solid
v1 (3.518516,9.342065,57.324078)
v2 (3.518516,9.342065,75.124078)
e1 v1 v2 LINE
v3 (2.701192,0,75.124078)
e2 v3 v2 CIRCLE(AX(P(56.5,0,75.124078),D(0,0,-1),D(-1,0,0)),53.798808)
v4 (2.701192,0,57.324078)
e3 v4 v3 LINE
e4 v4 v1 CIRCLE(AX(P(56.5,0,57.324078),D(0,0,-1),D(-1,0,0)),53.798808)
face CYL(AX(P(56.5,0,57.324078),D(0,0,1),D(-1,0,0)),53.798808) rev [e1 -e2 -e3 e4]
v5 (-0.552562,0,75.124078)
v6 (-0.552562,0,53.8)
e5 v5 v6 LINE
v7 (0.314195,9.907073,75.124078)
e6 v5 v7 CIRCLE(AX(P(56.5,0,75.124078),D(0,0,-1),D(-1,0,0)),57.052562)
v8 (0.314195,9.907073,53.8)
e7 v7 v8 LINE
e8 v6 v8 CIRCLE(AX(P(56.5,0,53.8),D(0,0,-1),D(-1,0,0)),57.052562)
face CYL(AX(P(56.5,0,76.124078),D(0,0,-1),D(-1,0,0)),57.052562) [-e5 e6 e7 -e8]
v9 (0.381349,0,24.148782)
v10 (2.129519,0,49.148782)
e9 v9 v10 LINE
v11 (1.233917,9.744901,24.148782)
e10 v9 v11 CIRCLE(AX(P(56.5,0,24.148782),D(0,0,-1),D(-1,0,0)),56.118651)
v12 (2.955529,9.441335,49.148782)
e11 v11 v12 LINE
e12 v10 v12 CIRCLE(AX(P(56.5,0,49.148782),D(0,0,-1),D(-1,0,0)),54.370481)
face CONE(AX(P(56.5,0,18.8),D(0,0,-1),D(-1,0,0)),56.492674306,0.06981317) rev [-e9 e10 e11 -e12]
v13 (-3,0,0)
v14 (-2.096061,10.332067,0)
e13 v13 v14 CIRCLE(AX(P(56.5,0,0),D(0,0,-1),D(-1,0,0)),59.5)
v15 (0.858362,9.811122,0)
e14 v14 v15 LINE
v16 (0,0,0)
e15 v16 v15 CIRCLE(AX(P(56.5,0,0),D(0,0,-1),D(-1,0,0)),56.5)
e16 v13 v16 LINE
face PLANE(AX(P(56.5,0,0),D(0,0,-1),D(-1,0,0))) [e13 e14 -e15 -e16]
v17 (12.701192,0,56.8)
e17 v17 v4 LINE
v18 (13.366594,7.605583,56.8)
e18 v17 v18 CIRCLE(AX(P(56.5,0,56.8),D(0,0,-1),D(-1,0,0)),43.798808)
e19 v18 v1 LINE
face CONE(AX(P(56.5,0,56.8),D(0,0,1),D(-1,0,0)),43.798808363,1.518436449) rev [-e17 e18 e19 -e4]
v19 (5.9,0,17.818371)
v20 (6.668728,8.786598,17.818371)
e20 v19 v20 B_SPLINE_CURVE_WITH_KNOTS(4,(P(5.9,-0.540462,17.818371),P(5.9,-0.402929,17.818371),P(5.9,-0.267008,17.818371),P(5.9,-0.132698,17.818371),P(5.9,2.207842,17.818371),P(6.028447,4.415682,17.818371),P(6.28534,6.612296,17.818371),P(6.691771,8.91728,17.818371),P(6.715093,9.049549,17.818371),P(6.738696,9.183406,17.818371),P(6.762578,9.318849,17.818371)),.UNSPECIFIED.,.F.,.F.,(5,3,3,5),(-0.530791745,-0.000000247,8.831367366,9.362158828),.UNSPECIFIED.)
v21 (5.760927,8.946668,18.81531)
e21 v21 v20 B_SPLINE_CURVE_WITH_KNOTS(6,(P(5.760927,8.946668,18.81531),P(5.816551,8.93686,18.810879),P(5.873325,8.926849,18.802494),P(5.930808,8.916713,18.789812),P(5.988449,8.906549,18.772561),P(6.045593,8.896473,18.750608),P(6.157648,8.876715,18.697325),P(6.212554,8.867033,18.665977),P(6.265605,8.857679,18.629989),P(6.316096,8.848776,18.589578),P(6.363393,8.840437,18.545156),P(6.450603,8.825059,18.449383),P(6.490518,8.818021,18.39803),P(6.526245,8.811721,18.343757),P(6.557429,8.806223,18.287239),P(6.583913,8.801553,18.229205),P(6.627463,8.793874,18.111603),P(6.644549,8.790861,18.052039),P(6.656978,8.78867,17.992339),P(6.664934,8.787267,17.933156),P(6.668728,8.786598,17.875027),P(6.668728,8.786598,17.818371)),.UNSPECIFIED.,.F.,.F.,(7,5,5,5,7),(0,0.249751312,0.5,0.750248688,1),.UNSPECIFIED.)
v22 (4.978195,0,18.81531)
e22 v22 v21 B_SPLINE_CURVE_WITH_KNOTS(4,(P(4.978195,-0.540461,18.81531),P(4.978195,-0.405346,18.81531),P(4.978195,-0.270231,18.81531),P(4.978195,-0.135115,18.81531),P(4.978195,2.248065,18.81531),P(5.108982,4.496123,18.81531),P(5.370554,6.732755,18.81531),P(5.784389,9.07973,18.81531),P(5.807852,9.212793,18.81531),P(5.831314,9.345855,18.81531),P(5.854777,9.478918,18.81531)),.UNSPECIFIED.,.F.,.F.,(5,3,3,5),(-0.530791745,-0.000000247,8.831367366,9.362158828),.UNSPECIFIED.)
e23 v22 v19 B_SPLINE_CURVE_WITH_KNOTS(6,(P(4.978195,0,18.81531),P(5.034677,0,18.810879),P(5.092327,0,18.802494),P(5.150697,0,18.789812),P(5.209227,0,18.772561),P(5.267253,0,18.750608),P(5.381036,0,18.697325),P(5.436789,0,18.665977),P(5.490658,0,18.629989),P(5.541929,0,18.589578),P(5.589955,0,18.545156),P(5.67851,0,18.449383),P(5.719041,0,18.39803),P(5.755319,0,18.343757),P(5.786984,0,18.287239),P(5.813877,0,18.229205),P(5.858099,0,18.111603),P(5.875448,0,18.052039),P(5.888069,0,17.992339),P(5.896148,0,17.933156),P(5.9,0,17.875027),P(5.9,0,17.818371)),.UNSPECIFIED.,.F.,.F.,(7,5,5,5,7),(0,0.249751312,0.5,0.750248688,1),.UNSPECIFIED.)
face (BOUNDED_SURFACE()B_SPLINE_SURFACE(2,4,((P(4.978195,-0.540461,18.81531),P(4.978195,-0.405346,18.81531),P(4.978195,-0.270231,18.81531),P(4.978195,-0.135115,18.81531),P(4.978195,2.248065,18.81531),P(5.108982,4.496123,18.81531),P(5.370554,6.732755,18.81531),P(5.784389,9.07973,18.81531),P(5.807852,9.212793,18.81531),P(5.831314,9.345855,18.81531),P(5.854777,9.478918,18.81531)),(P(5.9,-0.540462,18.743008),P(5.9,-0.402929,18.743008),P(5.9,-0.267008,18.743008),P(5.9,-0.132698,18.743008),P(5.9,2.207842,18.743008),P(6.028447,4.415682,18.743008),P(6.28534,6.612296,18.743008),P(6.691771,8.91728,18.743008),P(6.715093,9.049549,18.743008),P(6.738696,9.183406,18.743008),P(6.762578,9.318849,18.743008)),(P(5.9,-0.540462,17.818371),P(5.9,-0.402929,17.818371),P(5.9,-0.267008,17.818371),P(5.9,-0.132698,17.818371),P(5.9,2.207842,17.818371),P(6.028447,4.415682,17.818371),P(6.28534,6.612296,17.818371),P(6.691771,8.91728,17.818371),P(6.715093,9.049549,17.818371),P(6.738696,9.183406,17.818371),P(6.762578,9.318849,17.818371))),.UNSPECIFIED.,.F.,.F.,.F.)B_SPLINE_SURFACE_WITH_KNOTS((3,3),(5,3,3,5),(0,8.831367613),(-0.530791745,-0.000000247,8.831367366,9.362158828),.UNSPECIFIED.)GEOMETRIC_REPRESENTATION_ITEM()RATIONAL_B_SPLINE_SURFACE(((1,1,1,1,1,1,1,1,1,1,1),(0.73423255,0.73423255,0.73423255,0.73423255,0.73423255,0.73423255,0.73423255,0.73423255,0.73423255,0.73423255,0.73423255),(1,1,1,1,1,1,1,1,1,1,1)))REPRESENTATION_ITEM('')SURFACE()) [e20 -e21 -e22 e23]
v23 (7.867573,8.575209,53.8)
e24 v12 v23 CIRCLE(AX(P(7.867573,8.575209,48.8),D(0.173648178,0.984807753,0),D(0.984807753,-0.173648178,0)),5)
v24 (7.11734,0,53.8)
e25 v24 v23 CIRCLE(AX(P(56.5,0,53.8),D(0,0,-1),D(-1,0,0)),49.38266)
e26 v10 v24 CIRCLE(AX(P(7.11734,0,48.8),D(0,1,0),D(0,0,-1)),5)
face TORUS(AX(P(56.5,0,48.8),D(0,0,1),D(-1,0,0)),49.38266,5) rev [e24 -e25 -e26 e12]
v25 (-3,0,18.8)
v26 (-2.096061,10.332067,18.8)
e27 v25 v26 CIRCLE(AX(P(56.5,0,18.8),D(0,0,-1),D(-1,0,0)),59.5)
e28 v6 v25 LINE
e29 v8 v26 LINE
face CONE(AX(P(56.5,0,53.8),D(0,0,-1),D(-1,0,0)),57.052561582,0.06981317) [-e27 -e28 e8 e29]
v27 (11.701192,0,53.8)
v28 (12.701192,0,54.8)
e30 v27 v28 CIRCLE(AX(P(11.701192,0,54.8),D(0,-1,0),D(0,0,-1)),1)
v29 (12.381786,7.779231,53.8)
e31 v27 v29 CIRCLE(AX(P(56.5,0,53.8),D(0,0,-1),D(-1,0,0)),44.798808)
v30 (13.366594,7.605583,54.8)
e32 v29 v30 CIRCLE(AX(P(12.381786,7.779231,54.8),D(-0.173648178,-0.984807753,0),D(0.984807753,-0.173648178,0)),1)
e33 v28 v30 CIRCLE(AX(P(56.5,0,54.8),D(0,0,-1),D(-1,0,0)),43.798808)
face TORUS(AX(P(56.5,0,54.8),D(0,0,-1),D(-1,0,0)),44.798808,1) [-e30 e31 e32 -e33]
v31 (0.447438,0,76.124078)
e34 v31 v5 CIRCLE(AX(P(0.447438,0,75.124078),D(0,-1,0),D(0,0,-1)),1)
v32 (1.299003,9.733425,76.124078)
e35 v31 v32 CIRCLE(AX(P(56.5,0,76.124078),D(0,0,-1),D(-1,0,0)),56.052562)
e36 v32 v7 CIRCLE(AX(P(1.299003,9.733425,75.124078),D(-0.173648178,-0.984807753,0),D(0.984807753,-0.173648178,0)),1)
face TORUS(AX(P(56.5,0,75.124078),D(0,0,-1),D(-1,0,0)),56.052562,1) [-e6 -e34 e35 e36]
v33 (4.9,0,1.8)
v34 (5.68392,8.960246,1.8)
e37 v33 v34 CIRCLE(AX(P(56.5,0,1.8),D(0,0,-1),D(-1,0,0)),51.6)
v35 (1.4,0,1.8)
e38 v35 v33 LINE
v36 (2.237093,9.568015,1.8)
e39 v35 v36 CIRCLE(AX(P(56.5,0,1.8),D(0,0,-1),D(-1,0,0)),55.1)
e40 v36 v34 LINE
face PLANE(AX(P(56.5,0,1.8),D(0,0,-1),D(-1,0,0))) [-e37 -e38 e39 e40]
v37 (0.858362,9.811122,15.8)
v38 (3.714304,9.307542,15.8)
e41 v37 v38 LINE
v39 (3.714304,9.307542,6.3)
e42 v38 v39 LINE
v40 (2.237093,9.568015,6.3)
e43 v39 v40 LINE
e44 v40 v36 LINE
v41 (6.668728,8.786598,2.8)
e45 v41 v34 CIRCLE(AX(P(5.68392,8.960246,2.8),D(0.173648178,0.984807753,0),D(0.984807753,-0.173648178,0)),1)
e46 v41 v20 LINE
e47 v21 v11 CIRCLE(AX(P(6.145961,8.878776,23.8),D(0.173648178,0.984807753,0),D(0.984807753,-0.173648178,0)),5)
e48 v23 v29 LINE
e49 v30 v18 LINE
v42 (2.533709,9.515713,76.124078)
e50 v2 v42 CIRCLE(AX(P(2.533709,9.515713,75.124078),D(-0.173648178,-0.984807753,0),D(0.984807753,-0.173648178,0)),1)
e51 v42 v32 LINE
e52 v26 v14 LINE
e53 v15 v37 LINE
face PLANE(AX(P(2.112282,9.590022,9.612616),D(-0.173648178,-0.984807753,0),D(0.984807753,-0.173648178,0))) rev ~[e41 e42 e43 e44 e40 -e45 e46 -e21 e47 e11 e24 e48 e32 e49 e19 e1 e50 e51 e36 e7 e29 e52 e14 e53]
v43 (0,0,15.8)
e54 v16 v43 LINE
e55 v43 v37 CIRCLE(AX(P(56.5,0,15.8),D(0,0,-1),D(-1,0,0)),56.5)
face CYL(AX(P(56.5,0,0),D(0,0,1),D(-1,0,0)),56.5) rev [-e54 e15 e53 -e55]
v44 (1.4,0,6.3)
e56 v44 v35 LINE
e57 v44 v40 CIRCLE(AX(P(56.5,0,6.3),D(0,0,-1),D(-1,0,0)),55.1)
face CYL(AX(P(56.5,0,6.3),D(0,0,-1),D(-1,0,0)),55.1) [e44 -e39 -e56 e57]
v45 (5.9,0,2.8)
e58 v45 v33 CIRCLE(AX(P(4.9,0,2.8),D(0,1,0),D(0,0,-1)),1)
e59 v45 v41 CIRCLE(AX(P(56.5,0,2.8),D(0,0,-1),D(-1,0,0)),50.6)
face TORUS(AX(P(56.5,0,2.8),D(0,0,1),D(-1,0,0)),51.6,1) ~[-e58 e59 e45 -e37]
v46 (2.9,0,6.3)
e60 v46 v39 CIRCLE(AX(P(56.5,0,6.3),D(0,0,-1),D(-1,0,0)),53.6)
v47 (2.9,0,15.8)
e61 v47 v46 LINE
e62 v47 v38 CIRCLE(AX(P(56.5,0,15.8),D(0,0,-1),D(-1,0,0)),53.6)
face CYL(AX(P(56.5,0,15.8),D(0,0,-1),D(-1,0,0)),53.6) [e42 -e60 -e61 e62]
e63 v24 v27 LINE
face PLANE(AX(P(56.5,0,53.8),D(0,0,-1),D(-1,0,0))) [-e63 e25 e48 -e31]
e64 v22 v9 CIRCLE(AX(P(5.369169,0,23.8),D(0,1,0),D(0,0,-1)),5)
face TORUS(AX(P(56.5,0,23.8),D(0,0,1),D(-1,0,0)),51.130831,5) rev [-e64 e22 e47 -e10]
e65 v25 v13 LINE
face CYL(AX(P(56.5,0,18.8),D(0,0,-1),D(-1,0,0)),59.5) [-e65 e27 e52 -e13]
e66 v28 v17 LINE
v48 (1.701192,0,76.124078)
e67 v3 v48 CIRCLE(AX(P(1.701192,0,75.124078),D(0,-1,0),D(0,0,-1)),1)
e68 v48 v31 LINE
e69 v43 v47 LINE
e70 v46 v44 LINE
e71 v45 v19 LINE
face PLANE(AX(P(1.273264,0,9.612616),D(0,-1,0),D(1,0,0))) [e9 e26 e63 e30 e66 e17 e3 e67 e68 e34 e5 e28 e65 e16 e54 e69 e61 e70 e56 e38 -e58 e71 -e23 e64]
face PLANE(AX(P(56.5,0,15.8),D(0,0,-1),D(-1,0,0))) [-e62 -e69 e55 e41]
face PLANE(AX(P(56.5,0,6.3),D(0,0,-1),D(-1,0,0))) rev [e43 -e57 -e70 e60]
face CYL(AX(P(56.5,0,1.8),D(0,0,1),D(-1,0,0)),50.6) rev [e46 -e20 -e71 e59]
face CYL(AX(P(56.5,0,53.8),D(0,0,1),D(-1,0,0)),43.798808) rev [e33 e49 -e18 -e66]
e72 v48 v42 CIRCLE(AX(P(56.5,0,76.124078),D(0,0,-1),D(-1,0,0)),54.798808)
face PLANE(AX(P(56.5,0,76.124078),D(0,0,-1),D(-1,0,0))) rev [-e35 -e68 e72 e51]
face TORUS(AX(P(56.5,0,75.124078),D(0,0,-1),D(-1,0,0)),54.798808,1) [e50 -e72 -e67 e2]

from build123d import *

# Parameters (mm, degrees)
F1_ANGLE = 10
F2_R     = 5
F3_R     = 1


# Not quite as in the source:
# - a feature names something its author has since deleted; it is built from what else it names


with BuildPart() as f1:
    # F0 (on Front) → F1 (revolve)
    with BuildSketch(Plane.XZ):
        Polygon((-3, 0), (0, 0), (0, 15.8), (2.9, 15.8), (2.9, 6.3), (1.4, 6.3), (1.4, 1.8), (5.9, 1.8), (5.9, 18.8), (0.0073256942, 18.8), (-3, 18.8), align=None)
        Polygon((-0.552561582, 53.8), (-3, 18.8), (0.0073256942, 18.8), (2.4547641123, 53.8), align=None)
        Polygon((-0.552561582, 76.1240777928), (-0.552561582, 53.8), (2.4547641123, 53.8), (12.7011916374, 53.8), (12.7011916374, 56.8), (2.7011916374, 57.3240777928), (2.7011916374, 76.1240777928), align=None)
    revolve(axis=Axis((56.5, 0, 26.2500001118), (0, 0, -1)), revolution_arc=F1_ANGLE)

    # F2
    f2_edges = [f1.edges().sort_by_distance(p)[0] for p in [
        (0.222297, 4.923661, 18.8),
        (2.660423, 4.710353, 53.8),
    ]]
    fillet(f2_edges, radius=F2_R)

    # F3
    f3_edges = [f1.edges().sort_by_distance(p)[0] for p in [
        (6.092548, 4.410081, 1.8),
        (6.092548, 4.410081, 18.8),
        (12.867859, 3.817318, 53.8),
        (2.905912, 4.688875, 76.124078),
        (-0.335459, 4.972458, 76.124078),
    ]]
    fillet(f3_edges, radius=F3_R)


solid = f1.part
